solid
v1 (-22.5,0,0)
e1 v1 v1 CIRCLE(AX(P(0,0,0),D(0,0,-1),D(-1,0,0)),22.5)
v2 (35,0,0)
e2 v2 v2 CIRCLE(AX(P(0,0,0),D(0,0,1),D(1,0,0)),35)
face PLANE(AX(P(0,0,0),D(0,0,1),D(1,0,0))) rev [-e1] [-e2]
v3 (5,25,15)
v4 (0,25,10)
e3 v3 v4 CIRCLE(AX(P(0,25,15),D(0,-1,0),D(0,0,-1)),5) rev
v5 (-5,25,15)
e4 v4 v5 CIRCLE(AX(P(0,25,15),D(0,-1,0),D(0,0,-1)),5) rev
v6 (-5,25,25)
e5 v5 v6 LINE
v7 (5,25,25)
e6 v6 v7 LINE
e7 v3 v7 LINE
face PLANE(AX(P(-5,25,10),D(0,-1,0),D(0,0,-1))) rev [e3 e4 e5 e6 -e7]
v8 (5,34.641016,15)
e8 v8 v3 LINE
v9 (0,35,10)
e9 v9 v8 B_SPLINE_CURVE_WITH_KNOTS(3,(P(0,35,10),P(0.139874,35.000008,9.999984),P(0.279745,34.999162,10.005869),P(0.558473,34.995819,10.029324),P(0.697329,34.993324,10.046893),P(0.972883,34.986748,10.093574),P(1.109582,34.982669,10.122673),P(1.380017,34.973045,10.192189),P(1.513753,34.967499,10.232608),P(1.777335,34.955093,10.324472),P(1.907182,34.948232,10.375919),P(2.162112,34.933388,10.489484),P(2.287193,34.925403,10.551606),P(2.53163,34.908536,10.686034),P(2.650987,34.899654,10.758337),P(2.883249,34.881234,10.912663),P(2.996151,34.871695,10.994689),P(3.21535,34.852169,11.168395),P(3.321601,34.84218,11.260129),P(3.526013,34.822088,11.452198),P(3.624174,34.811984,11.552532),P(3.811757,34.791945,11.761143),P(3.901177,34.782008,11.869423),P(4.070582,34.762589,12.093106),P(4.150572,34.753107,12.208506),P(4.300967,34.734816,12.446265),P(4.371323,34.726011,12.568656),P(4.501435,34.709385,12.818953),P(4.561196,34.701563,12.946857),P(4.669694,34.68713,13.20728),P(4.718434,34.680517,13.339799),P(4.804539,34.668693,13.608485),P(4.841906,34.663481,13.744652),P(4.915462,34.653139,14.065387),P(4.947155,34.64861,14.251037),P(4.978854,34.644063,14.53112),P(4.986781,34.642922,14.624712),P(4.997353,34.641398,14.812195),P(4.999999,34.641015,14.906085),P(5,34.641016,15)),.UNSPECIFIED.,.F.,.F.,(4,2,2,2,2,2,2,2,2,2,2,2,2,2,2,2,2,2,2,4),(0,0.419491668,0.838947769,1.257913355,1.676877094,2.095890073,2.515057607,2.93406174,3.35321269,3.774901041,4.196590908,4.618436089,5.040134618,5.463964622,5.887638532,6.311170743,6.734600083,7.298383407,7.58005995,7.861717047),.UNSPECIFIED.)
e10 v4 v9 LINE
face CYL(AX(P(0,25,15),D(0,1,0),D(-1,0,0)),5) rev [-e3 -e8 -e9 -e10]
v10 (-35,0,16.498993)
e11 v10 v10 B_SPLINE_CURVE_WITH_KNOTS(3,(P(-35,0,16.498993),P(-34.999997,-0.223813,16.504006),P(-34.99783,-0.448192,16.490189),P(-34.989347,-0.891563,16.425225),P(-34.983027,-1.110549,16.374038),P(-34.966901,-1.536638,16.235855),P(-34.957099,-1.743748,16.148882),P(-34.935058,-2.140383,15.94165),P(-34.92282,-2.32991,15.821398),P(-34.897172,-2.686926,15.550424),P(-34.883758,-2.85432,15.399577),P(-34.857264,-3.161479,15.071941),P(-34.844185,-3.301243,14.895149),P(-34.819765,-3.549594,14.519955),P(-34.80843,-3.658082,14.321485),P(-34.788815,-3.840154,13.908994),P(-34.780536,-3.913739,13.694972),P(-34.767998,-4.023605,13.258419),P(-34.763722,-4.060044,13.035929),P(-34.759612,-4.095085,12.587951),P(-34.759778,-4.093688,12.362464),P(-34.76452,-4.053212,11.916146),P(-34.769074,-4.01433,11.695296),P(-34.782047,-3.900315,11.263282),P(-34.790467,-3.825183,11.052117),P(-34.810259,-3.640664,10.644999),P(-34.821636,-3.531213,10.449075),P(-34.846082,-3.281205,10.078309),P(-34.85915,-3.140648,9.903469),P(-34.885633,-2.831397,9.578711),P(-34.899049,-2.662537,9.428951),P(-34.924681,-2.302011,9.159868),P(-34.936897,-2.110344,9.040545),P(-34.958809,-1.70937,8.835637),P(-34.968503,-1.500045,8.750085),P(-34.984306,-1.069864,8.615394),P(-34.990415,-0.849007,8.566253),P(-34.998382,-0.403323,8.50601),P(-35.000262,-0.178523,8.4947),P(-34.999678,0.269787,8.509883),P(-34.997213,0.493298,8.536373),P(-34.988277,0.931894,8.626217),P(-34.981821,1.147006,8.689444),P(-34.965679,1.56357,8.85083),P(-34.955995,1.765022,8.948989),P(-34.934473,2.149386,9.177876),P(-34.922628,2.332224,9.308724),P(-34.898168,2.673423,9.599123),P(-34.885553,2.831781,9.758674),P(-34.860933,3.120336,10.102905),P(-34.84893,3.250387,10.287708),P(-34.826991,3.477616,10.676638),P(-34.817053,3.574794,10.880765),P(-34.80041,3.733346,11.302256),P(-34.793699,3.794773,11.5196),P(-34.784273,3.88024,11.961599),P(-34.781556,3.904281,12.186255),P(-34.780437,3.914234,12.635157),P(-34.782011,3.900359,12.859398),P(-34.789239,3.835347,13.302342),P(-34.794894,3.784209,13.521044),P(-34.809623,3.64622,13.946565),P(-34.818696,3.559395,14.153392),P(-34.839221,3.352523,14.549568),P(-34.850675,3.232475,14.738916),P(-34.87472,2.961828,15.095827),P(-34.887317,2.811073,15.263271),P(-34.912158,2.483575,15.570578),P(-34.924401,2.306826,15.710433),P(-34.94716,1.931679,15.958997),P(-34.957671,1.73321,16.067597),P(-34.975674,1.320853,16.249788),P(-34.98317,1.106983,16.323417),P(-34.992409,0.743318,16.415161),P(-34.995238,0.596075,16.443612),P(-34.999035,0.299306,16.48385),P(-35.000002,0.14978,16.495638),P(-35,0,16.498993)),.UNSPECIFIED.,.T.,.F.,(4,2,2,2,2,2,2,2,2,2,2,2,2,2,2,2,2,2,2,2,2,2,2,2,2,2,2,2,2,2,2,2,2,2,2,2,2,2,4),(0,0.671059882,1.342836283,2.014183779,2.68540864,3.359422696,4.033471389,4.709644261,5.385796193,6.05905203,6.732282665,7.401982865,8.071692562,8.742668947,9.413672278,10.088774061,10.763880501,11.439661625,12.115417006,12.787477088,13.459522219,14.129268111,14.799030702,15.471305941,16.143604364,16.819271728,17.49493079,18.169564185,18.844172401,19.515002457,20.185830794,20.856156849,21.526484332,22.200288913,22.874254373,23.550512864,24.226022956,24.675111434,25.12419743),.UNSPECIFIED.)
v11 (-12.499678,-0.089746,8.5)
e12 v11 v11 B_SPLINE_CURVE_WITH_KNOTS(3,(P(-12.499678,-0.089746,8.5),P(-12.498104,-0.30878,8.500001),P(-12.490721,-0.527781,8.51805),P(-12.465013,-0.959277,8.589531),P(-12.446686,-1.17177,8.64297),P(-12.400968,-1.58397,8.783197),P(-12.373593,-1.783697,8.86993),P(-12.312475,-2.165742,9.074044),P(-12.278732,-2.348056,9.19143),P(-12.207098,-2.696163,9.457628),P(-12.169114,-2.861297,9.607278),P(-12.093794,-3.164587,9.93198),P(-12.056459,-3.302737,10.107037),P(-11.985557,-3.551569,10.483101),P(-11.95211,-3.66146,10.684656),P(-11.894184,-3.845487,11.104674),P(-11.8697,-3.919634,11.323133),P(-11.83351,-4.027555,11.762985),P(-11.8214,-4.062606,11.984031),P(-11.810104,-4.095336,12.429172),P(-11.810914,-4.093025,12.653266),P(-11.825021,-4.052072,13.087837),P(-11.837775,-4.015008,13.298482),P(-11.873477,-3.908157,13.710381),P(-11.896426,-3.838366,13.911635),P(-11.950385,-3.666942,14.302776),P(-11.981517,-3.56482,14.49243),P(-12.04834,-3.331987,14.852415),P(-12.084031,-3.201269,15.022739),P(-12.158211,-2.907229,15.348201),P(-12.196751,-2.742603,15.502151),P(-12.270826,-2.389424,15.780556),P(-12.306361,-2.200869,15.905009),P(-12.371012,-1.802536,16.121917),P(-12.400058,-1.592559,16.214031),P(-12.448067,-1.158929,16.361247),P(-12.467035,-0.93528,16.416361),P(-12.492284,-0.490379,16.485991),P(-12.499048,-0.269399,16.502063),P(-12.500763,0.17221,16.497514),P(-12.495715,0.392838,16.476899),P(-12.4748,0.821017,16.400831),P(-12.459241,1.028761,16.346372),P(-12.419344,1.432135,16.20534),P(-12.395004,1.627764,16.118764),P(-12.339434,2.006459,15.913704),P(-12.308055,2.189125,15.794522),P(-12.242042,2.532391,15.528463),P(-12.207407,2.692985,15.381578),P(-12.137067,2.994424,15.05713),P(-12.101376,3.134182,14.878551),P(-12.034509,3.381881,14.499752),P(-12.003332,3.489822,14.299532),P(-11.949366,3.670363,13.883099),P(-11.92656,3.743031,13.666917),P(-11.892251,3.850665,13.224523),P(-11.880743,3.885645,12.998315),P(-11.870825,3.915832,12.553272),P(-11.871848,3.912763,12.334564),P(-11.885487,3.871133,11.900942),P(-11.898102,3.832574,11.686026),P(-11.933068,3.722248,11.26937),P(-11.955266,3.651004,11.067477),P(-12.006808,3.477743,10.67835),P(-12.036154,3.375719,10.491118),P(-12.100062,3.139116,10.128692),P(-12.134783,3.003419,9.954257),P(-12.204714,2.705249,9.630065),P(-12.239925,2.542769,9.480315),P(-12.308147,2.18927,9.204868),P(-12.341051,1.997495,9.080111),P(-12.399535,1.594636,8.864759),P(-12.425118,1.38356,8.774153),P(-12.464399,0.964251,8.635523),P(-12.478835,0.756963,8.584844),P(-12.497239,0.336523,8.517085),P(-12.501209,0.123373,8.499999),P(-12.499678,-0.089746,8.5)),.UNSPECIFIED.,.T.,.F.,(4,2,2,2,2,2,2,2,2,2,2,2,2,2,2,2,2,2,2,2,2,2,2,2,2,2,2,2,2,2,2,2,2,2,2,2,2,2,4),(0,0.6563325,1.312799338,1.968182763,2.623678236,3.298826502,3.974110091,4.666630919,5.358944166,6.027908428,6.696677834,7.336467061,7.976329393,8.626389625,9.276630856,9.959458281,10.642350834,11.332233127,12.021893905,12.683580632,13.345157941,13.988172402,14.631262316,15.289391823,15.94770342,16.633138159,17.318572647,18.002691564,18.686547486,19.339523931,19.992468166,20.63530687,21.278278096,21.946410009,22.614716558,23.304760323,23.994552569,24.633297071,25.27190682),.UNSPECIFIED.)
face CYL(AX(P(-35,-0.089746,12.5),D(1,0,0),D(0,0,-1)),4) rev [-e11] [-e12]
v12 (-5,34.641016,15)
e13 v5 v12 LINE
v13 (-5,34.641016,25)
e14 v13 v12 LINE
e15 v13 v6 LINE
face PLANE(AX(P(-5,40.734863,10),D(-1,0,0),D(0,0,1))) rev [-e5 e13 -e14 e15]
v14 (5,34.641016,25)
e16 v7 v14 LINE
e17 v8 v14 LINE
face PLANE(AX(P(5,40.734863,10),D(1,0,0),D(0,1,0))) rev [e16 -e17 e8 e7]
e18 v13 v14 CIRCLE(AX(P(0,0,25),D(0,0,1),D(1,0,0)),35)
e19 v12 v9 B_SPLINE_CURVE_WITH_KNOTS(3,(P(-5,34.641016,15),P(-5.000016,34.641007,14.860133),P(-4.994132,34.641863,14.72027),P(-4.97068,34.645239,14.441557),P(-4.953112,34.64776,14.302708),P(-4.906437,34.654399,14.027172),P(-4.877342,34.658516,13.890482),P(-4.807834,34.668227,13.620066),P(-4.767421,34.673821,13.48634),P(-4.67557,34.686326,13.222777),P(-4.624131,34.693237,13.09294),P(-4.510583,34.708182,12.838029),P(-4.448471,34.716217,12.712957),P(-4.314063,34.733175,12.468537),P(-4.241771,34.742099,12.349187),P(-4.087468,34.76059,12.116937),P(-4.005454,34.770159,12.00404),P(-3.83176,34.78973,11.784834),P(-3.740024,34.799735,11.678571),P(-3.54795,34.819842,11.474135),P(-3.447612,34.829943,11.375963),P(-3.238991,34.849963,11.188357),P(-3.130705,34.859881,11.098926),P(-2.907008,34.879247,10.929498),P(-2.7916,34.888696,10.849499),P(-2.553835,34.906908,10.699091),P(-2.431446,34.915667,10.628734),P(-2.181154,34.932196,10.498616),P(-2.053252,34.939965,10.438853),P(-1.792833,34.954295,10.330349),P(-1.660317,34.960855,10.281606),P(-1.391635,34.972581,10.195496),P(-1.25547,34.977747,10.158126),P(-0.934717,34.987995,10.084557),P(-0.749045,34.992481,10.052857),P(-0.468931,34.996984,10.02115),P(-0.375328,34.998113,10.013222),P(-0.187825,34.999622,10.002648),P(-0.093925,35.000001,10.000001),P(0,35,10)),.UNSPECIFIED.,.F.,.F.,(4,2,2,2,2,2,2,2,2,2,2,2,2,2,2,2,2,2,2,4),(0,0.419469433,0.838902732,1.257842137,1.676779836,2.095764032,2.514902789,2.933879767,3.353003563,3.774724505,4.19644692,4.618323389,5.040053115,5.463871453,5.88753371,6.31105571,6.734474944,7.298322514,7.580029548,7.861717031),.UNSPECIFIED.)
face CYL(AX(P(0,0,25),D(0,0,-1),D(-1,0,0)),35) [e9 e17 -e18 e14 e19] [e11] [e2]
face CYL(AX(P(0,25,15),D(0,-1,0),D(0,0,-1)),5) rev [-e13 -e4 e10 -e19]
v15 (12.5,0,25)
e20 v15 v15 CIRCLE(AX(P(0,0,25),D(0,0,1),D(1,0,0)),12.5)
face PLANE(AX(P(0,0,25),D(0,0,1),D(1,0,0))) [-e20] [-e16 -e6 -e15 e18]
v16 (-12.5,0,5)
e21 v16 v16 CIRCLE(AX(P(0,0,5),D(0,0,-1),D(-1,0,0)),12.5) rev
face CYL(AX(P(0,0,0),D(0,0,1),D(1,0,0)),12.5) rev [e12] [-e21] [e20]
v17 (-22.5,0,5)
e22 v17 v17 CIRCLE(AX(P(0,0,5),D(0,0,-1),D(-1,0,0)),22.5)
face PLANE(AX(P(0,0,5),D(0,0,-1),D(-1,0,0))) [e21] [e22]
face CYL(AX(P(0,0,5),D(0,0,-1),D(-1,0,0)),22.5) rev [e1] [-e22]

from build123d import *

# Parameters (mm, degrees)
SKETCH1_R          = 35
EXTRUDE1_DEPTH     = 25
SKETCH2_R          = 12.5
CUT_EXTRUDE1_DEPTH = 56.452682532
SKETCH3_W          = 10
SKETCH3_H          = 15.734862576
CUT_EXTRUDE2_DEPTH = 15
FILLET1_R          = 5
SKETCH4_R          = 22.5
CUT_EXTRUDE4_DEPTH = 5
SKETCH5_R          = 4
SIDE_HOLE_DEPTH    = 56.452682595


with BuildPart() as part:
    # Sketch1 → Extrude1 (new body)
    with BuildSketch(Plane.XY):
        Circle(SKETCH1_R)
    extrude(amount=EXTRUDE1_DEPTH)

    # Sketch2 → Cut-Extrude1 (cut, through all)
    with BuildSketch(Plane.XY.offset(25)):
        Circle(SKETCH2_R)
    extrude(amount=-CUT_EXTRUDE1_DEPTH, mode=Mode.SUBTRACT)

    # Sketch3 → Cut-Extrude2 (cut)
    with BuildSketch(Plane.XY.offset(25)):
        with Locations((0, 32.867431288)):
            Rectangle(SKETCH3_W, SKETCH3_H)
    extrude(amount=-CUT_EXTRUDE2_DEPTH, mode=Mode.SUBTRACT)

    # Fillet1
    # the kernel refuses this fillet: 5 mm, written as the material it adds along each edge
    with BuildSketch(Plane(origin=(-5, 12.5, 10), x_dir=(0, 0, 1), z_dir=(0, 1, 0))) as fillet1_piece_1_section:
        with BuildLine():
            CenterArc((FILLET1_R, FILLET1_R), FILLET1_R, 180, 90)
            Line((0, FILLET1_R), (0, 0))
            Line((0, 0), (FILLET1_R, 0))
        make_face()
    fillet1_piece_1 = extrude(amount=34.641016151, mode=Mode.PRIVATE)
    fillet1_piece_1 = fillet1_piece_1 & Plane(origin=(0, 0, 10), x_dir=(1, 0, 0), z_dir=(0, 0, -1)) * Cylinder(35, 90, mode=Mode.PRIVATE)
    with BuildSketch(Plane(origin=(5, 47.141016151, 10), x_dir=(-1, 0, 0), z_dir=(0, -1, 0))) as fillet1_piece_2_section:
        with BuildLine():
            CenterArc((FILLET1_R, -FILLET1_R), FILLET1_R, 90, 90)
            Line((0, -FILLET1_R), (0, 0))
            Line((0, 0), (FILLET1_R, 0))
        make_face()
    fillet1_piece_2 = extrude(amount=34.641016151, mode=Mode.PRIVATE)
    fillet1_piece_2 = fillet1_piece_2 & Plane(origin=(0, 0, 10), x_dir=(1, 0, 0), z_dir=(0, 0, -1)) * Cylinder(35, 90, mode=Mode.PRIVATE)
    add([fillet1_piece_1, fillet1_piece_2])

    # Sketch4 → Cut-Extrude4 (cut)
    with BuildSketch(Plane(origin=(0, 0, 0), x_dir=(-1, 0, 0), z_dir=(0, 0, -1))):
        Circle(SKETCH4_R)
    extrude(amount=-CUT_EXTRUDE4_DEPTH, mode=Mode.SUBTRACT)

    # Sketch5 → Side hole (cut, through all)
    with BuildSketch(Plane(origin=(0, 0, 0), x_dir=(0, 0, -1), z_dir=(1, 0, 0))):
        with Locations((-12.5, -0.089745962)):
            Circle(SKETCH5_R)
    extrude(amount=-SIDE_HOLE_DEPTH, mode=Mode.SUBTRACT)


solid = part.part
